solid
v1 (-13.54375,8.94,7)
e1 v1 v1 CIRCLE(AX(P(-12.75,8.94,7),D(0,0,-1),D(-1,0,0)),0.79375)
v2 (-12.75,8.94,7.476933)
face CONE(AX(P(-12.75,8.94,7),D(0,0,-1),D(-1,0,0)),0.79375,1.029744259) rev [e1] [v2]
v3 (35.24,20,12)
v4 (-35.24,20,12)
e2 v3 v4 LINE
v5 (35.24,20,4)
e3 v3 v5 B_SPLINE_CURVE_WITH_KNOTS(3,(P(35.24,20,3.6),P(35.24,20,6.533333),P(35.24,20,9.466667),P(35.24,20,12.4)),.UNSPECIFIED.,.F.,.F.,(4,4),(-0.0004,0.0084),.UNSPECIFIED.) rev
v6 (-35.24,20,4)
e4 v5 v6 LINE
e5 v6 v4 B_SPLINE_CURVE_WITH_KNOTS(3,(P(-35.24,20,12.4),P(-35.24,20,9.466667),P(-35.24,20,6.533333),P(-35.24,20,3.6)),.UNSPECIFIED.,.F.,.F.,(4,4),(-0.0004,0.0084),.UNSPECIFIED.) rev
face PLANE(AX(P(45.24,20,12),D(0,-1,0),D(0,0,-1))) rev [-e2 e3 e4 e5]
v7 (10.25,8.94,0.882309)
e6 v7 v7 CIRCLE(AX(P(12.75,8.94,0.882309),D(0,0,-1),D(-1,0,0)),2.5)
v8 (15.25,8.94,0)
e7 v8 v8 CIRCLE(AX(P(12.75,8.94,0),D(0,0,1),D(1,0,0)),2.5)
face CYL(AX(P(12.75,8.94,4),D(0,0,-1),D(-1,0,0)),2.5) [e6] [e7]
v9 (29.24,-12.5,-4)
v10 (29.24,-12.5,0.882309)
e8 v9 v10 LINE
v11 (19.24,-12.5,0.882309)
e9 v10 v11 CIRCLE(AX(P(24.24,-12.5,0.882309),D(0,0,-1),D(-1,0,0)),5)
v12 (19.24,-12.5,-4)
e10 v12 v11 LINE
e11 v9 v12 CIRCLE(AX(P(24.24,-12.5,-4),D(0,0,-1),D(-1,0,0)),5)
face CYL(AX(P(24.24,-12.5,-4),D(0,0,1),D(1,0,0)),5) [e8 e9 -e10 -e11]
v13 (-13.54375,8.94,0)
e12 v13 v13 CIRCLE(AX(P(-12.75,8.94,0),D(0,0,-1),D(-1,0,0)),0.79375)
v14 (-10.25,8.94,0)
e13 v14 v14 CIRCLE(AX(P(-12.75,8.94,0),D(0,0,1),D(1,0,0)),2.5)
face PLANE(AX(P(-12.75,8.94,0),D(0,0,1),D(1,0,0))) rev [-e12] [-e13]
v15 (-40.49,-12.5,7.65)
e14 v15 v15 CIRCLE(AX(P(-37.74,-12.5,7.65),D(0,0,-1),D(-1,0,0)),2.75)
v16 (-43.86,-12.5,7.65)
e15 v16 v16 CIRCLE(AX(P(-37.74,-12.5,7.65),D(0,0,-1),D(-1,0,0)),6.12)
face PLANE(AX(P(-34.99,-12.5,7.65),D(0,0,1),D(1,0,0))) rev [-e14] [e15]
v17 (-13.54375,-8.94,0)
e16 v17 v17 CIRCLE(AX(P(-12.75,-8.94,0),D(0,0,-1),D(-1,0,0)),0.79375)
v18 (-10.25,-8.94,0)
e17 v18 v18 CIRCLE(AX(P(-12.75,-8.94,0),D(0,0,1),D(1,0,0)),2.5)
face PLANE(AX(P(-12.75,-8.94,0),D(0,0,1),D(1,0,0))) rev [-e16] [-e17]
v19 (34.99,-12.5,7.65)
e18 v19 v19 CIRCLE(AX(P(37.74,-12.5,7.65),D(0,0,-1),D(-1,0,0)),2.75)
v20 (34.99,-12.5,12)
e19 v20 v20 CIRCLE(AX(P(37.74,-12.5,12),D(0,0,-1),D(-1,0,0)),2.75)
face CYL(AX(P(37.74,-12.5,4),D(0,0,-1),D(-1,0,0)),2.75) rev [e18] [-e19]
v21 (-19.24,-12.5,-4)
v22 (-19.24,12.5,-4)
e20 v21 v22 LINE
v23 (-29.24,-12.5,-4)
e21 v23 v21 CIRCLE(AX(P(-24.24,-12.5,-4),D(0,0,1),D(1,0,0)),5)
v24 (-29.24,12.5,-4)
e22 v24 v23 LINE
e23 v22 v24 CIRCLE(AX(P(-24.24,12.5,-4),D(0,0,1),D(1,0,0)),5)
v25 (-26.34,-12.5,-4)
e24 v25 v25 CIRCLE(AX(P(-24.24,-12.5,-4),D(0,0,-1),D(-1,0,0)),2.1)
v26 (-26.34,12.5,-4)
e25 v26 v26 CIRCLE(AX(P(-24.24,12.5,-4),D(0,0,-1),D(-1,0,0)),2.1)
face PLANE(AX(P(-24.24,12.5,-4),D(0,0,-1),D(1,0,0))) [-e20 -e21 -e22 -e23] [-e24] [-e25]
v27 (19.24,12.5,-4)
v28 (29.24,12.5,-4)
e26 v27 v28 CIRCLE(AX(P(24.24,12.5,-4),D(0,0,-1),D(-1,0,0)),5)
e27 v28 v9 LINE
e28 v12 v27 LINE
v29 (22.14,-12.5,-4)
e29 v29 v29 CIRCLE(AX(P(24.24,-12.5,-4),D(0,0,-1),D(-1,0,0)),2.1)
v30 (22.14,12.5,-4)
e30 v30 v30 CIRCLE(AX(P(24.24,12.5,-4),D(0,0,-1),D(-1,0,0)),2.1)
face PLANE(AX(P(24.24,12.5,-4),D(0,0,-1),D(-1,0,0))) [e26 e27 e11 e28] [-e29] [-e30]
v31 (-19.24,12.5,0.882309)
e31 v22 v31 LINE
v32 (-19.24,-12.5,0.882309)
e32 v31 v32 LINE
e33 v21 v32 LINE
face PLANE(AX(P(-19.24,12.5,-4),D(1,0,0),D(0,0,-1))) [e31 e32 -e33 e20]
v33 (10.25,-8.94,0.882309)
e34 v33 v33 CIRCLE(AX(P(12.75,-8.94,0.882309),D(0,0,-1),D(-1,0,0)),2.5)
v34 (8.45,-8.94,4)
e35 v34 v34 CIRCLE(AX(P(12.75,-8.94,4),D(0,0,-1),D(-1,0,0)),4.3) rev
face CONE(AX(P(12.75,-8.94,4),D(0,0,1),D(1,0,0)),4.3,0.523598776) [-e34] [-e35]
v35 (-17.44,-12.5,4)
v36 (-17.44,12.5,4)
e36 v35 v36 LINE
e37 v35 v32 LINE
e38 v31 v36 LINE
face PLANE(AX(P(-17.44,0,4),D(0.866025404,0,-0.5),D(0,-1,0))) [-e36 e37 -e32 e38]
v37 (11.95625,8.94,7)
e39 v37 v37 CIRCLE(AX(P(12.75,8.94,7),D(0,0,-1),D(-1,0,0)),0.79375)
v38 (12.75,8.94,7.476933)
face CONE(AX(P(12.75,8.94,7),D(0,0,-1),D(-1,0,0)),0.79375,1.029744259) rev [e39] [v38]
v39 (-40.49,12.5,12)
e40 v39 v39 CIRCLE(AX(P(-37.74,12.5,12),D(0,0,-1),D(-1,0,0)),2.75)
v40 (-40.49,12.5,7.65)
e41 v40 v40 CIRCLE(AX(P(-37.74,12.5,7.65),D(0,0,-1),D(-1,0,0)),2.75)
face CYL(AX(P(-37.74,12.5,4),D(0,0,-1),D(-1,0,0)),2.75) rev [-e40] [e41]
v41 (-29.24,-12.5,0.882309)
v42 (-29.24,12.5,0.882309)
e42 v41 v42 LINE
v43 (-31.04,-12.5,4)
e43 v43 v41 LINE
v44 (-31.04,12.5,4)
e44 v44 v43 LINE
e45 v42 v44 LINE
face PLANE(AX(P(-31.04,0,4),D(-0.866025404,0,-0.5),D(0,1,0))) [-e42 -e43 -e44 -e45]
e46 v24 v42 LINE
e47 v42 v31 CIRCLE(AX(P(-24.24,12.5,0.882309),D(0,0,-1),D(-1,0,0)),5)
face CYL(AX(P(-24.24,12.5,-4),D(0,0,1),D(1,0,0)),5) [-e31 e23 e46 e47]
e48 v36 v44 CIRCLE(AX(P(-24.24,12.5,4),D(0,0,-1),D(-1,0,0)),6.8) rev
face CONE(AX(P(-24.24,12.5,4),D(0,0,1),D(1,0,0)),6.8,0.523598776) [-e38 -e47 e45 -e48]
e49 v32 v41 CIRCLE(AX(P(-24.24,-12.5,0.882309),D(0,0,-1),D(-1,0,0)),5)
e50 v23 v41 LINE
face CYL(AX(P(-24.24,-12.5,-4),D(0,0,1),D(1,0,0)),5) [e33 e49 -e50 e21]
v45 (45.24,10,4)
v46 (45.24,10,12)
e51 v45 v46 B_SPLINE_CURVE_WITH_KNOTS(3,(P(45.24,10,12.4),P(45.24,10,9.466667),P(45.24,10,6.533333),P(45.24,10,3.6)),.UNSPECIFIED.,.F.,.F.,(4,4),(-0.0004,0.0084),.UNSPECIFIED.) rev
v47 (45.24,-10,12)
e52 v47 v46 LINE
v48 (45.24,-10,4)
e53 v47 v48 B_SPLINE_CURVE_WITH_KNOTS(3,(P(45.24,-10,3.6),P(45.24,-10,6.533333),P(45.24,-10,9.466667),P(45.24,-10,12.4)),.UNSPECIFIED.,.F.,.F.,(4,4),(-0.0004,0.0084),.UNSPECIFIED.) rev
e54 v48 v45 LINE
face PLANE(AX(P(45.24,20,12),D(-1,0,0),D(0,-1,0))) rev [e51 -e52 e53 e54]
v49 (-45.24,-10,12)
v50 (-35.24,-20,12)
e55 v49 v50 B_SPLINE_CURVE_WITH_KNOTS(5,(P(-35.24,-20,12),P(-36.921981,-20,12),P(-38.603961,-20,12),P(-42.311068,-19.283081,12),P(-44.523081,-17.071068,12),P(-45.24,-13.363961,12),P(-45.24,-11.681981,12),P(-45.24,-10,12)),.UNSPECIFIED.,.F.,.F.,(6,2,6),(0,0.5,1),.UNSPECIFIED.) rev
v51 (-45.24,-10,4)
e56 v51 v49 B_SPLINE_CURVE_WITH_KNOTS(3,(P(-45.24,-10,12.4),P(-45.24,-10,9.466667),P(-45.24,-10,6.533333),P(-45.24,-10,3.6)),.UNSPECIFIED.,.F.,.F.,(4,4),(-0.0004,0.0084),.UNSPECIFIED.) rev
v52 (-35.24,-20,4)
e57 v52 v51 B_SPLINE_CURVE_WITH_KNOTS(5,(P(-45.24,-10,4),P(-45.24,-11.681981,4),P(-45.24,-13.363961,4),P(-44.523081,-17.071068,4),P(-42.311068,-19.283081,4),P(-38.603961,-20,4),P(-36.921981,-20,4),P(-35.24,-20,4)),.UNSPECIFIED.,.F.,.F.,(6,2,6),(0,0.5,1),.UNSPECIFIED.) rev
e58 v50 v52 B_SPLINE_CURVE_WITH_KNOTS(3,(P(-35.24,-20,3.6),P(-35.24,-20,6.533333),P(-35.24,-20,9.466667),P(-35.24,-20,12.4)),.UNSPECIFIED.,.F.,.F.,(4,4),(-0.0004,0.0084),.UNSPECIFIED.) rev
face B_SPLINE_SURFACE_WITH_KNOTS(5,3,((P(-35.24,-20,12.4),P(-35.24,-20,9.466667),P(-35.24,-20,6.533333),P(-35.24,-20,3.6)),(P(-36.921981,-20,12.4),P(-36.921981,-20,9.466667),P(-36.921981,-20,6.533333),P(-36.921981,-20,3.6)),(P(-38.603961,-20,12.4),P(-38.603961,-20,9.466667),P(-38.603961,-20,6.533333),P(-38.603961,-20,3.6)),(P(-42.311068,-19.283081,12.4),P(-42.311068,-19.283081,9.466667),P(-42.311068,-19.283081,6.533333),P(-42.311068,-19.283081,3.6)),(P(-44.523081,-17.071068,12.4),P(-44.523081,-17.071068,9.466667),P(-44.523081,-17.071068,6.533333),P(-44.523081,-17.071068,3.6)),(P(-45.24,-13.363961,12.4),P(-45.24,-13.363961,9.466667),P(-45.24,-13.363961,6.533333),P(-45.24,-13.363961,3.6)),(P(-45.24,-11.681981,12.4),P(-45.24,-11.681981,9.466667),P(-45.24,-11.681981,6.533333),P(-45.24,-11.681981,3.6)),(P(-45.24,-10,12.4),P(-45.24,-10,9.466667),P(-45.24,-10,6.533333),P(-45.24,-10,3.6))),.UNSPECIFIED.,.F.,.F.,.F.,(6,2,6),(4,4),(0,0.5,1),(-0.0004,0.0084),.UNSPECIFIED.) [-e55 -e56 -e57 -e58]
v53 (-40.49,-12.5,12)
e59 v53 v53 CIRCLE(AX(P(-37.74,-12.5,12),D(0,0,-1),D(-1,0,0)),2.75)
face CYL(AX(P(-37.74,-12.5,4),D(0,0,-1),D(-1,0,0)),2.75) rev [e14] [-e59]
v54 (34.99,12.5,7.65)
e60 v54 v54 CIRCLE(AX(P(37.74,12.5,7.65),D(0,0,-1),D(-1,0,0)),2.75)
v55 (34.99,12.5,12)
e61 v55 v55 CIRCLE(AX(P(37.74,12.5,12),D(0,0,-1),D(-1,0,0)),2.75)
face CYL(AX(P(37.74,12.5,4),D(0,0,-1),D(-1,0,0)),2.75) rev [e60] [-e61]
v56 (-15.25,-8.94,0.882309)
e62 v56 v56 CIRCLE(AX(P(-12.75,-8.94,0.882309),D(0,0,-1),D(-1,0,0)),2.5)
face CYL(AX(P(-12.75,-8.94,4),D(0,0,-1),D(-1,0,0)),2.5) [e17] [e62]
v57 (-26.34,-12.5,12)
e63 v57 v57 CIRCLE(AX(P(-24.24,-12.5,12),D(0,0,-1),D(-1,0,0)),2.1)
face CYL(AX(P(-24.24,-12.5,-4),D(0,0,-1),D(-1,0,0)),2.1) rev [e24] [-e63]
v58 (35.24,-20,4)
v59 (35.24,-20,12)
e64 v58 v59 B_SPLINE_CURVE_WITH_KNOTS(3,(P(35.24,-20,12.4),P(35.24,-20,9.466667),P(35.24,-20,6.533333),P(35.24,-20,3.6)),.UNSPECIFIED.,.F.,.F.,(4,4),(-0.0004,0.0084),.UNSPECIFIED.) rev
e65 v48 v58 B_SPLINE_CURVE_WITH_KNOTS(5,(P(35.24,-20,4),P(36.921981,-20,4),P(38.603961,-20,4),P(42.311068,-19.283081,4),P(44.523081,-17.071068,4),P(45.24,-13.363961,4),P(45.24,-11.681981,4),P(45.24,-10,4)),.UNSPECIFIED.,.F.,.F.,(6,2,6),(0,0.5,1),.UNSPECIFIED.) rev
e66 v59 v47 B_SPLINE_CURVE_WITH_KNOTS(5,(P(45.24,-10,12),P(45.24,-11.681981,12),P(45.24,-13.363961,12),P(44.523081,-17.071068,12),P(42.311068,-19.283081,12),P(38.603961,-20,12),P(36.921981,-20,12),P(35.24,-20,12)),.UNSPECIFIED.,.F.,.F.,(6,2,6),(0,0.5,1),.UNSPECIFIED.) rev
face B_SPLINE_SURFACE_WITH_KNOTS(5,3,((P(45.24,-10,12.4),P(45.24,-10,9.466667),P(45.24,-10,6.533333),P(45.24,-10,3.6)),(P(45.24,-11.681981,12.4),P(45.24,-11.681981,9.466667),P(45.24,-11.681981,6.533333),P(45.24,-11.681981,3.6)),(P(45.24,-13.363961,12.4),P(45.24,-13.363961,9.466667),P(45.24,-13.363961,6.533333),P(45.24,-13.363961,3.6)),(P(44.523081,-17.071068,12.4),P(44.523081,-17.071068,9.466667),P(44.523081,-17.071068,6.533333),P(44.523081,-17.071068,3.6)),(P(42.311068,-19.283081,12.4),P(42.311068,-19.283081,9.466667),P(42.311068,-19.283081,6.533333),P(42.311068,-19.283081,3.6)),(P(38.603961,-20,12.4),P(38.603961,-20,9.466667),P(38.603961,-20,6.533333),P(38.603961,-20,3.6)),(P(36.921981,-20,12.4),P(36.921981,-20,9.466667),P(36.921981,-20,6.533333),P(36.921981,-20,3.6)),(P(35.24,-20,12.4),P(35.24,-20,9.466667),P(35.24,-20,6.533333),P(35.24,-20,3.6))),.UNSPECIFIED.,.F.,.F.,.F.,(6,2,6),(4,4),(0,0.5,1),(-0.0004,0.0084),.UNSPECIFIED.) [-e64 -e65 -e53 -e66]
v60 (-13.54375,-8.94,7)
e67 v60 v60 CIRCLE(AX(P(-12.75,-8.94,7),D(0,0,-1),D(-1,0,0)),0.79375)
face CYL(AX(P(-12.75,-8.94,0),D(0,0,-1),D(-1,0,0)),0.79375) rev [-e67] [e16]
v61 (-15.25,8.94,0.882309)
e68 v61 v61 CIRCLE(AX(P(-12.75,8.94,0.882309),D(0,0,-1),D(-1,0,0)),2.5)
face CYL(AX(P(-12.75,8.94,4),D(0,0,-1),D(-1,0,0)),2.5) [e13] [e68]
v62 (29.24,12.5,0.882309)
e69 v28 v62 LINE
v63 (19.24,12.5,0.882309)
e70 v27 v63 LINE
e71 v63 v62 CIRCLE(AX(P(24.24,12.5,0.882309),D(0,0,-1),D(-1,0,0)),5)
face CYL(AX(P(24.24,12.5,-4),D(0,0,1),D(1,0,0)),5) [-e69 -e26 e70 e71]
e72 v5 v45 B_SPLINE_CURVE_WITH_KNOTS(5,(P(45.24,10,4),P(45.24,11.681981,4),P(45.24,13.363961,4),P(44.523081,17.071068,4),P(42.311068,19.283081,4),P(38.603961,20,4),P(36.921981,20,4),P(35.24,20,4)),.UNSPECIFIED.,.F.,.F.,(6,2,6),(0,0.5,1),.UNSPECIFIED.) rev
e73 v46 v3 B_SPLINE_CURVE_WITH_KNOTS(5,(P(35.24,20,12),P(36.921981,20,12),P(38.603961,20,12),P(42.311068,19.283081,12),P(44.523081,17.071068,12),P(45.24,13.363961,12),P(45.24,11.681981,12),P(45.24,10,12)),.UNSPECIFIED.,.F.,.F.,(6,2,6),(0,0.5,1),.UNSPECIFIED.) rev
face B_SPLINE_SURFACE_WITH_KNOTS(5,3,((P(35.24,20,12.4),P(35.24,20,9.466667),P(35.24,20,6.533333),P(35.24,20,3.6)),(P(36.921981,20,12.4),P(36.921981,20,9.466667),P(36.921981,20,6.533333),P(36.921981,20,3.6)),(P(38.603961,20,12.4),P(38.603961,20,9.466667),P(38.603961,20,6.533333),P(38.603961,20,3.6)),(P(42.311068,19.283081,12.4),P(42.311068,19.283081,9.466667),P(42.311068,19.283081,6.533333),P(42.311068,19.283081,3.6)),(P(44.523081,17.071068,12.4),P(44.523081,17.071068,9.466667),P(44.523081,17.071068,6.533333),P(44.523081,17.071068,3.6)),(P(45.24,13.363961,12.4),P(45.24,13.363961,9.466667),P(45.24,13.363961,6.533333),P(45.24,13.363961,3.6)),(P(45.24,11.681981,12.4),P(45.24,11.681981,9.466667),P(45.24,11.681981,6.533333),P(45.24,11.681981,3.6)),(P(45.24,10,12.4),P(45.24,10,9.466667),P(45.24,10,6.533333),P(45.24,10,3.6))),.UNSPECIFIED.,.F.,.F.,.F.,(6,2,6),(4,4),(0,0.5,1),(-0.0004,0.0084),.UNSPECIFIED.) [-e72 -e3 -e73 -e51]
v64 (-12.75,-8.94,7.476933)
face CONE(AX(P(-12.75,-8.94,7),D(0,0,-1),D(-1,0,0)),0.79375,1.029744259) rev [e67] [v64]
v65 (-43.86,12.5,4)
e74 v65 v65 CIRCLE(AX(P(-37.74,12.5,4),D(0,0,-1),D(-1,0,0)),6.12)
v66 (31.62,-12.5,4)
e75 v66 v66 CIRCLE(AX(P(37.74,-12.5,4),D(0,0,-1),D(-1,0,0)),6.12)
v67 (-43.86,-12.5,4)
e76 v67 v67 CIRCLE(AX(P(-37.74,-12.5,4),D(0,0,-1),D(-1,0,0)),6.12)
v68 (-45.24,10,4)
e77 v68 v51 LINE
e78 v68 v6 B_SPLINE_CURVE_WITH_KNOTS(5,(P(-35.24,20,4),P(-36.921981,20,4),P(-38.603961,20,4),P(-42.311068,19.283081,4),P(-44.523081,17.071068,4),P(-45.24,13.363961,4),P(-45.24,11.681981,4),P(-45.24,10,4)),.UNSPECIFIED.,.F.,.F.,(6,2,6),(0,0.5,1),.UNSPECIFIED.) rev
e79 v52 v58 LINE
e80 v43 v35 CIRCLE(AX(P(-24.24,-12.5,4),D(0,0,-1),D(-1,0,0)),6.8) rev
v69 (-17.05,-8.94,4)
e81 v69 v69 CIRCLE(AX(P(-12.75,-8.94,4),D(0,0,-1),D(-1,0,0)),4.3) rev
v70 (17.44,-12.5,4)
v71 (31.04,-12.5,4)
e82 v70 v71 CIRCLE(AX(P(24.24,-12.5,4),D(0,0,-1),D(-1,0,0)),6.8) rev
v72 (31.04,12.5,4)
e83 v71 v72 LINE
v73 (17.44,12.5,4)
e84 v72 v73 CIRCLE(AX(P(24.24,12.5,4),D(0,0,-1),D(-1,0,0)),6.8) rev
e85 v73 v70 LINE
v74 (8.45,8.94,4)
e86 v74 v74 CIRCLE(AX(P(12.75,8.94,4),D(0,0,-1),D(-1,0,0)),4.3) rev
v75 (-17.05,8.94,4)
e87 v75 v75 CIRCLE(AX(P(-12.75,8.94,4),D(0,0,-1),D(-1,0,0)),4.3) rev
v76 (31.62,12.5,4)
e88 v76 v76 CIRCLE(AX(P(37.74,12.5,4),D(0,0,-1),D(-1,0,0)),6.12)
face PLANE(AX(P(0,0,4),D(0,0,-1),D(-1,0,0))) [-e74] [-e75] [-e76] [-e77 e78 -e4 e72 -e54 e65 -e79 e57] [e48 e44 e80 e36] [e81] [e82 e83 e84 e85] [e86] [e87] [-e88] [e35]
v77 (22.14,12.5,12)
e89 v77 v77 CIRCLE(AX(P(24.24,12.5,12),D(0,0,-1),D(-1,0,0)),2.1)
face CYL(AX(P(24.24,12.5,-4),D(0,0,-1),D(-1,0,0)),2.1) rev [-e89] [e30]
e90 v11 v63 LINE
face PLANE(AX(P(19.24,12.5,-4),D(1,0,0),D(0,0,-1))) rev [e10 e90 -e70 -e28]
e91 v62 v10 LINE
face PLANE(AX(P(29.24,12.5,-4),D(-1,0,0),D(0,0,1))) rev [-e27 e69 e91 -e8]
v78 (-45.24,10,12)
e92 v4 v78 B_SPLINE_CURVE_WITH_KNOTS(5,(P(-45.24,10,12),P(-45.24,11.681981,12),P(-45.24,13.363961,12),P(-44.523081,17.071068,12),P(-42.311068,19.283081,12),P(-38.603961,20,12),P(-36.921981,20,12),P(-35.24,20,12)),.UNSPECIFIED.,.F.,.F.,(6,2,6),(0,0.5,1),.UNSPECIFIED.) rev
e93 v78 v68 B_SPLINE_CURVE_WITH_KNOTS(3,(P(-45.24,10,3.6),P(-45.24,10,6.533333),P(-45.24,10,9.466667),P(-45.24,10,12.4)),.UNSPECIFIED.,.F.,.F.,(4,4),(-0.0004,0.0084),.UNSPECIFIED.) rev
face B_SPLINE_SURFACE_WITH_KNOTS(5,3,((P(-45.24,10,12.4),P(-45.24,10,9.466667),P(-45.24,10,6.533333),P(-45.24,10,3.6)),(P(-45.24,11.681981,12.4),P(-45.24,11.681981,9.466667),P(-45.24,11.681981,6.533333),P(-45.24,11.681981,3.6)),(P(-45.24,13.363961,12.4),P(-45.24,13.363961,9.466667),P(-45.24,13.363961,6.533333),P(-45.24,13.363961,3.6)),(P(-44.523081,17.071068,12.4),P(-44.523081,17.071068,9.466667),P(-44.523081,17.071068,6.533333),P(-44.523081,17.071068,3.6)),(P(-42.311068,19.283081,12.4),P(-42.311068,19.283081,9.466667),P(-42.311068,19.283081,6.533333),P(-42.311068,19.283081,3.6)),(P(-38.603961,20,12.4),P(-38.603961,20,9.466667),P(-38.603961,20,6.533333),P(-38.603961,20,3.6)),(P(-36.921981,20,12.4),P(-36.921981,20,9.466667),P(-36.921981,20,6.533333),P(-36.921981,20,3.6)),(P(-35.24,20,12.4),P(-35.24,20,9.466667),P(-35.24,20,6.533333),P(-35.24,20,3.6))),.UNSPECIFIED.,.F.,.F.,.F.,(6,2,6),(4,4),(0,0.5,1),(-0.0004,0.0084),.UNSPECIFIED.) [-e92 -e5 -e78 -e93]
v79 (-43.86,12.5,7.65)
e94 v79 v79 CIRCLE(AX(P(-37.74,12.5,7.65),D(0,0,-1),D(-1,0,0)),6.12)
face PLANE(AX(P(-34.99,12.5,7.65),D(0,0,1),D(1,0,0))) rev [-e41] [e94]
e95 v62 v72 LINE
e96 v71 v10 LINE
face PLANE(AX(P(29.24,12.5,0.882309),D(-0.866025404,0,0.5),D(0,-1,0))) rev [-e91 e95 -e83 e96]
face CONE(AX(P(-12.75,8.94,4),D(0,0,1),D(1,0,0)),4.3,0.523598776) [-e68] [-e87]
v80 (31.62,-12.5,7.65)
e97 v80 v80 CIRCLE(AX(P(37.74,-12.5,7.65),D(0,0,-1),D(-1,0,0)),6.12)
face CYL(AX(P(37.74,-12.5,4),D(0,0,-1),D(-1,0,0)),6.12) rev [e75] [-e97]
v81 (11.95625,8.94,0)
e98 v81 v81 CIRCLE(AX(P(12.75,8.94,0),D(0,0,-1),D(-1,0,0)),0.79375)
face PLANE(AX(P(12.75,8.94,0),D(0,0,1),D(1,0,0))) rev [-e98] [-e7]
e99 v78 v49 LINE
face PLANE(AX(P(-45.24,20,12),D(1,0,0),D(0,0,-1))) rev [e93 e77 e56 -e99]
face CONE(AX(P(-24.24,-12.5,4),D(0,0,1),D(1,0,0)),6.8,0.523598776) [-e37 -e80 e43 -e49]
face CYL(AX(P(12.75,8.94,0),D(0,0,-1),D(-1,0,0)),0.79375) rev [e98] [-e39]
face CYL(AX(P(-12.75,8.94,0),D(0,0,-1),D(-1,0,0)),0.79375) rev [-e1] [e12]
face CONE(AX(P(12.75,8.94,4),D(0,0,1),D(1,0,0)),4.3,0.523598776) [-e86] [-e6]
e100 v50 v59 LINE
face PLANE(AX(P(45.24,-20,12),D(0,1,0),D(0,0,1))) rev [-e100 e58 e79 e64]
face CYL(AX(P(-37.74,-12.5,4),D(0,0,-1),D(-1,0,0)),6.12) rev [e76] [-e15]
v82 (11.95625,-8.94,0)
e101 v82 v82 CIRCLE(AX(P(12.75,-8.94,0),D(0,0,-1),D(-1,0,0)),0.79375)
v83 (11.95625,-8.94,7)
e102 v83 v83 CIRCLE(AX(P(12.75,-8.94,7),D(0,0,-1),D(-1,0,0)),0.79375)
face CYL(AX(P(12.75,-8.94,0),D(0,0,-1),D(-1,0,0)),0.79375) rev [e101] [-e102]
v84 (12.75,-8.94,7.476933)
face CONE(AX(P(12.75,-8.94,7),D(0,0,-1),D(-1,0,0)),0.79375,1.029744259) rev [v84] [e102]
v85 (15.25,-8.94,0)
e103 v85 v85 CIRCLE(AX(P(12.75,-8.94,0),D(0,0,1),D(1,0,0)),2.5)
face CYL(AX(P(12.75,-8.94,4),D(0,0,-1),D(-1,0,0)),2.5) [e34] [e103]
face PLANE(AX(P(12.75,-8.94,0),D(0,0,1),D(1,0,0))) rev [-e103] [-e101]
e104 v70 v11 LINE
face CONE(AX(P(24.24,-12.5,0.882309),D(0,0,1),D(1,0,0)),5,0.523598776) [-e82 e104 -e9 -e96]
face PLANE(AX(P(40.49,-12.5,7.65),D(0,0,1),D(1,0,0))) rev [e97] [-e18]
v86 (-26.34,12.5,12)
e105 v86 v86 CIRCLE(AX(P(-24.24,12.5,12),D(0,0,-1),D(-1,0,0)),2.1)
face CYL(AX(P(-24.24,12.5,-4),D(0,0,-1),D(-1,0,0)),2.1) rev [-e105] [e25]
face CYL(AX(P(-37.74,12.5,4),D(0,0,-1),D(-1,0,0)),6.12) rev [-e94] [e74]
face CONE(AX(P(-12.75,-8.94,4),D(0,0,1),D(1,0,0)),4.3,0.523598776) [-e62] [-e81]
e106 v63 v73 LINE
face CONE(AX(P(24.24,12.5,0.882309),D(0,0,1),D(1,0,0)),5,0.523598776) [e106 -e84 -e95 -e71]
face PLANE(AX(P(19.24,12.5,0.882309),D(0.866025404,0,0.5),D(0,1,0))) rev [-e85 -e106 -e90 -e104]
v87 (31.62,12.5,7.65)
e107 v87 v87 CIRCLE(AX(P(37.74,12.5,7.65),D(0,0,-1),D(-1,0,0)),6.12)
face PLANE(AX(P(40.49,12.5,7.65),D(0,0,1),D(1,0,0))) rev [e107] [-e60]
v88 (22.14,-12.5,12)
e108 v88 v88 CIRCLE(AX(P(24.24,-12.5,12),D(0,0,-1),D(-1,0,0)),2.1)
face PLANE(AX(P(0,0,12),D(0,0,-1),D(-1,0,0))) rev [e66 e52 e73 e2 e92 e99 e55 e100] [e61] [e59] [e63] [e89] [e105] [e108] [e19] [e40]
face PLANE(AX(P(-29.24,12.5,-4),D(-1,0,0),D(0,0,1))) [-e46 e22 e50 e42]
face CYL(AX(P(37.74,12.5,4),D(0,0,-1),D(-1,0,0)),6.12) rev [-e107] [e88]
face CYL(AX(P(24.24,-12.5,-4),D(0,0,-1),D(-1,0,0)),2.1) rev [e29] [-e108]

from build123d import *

# Parameters (mm, degrees)
SKETCH1_R                                    = 2.5
BOSS_EXTRUDE1_DEPTH                          = 4
BOSS_EXTRUDE1_2_DEPTH                        = 4
BOSS_EXTRUDE1_3_DEPTH                        = 4
BOSS_EXTRUDE1_4_DEPTH                        = 4
SKETCH2_W                                    = 90.48
SKETCH2_H                                    = 40
BOSS_EXTRUDE2_DEPTH                          = 8
CBORE_FOR_M5_HEX_HEAD_CAP_SCREW1_D           = 5.5
CBORE_FOR_M5_HEX_HEAD_CAP_SCREW1_CBORE_D     = 12.24
CBORE_FOR_M5_HEX_HEAD_CAP_SCREW1_CBORE_DEPTH = 3.65
F_1_16_0_0625_DIAMETER_HOLE1_D               = 1.5875
F_1_16_0_0625_DIAMETER_HOLE1_DEPTH           = 7
F_1_16_0_0625_DIAMETER_HOLE1_TIP             = 0.476933116
FILLET1_SIZE                                 = 10
BOSS_EXTRUDE3_DEPTH                          = 8
M5X0_8_TAPPED_HOLE2_D                        = 4.2
CHAMFER1_SIZE                                = 1.8
CHAMFER1_SIZE2                               = 3.117691454


with BuildPart() as part:
    # Sketch1 → Boss-Extrude1 (new body)
    with BuildSketch(Plane.XY):
        with Locations((12.75, 8.94)):
            Circle(SKETCH1_R)
    extrude(amount=BOSS_EXTRUDE1_DEPTH)



with BuildPart() as body_2:
    # Sketch1 → Boss-Extrude1 2 (new body)
    with BuildSketch(Plane.XY):
        with Locations((12.75, -8.94)):
            Circle(SKETCH1_R)
    extrude(amount=BOSS_EXTRUDE1_2_DEPTH)


with BuildPart() as body_3:
    # Sketch1 → Boss-Extrude1 3 (new body)
    with BuildSketch(Plane.XY):
        with Locations((-12.75, -8.94)):
            Circle(SKETCH1_R)
    extrude(amount=BOSS_EXTRUDE1_3_DEPTH)


with BuildPart() as body_4:
    # Sketch1 → Boss-Extrude1 4 (new body)
    with BuildSketch(Plane.XY):
        with Locations((-12.75, 8.94)):
            Circle(SKETCH1_R)
    extrude(amount=BOSS_EXTRUDE1_4_DEPTH)


with BuildPart() as part_1:
    add(part.part)

    add(body_2.part)  # Boss-Extrude2 merges body 2

    add(body_3.part)  # Boss-Extrude2 merges body 3

    add(body_4.part)  # Boss-Extrude2 merges body 4
    # Sketch2 → Boss-Extrude2 (add)
    with BuildSketch(Plane.XY.offset(4)):
        Rectangle(SKETCH2_W, SKETCH2_H)
    extrude(amount=BOSS_EXTRUDE2_DEPTH)

    # CBORE for M5 Hex Head Cap Screw1 (through all)
    with Locations(Plane(origin=(0, 0, 4), x_dir=(-1, 0, 0), z_dir=(0, 0, -1))):
        with Locations((37.74, 12.5), (-37.74, -12.5), (-37.74, 12.5), (37.74, -12.5)):
            CounterBoreHole(CBORE_FOR_M5_HEX_HEAD_CAP_SCREW1_D / 2, CBORE_FOR_M5_HEX_HEAD_CAP_SCREW1_CBORE_D / 2, CBORE_FOR_M5_HEX_HEAD_CAP_SCREW1_CBORE_DEPTH)

    # 1/16 (0.0625) Diameter Hole1
    with Locations(Plane(origin=(0, 0, 0), x_dir=(-1, 0, 0), z_dir=(0, 0, -1))):
        with Locations((-12.75, -8.94), (-12.75, 8.94), (12.75, -8.94), (12.75, 8.94)):
            Hole(F_1_16_0_0625_DIAMETER_HOLE1_D / 2, depth=F_1_16_0_0625_DIAMETER_HOLE1_DEPTH)
            with Locations((0, 0, -(F_1_16_0_0625_DIAMETER_HOLE1_DEPTH + F_1_16_0_0625_DIAMETER_HOLE1_TIP / 2))):  # 118° drill point
                Cone(0, F_1_16_0_0625_DIAMETER_HOLE1_D / 2, F_1_16_0_0625_DIAMETER_HOLE1_TIP, mode=Mode.SUBTRACT)

    # Fillet1
    # a fillet whose section is not a circle: 10 mm, written as the material it takes off along each edge
    with BuildSketch(Plane(origin=(-45.24, -20, -21), x_dir=(0, 1, 0), z_dir=(0, 0, 1)), Plane(origin=(-45.24, 20, -21), x_dir=(1, 0, 0), z_dir=(0, 0, 1))) as fillet1_piece_1:
        with BuildLine():
            add(Edge.make_bspline([(FILLET1_SIZE, 0), (FILLET1_SIZE * 0.831801948466, 0), (FILLET1_SIZE * 0.663603896932, 0), (FILLET1_SIZE * 0.292893218813, -FILLET1_SIZE * 0.0716919198361), (FILLET1_SIZE * 0.0716919198361, -FILLET1_SIZE * 0.292893218813), (0, -FILLET1_SIZE * 0.663603896932), (0, -FILLET1_SIZE * 0.831801948466), (0, -FILLET1_SIZE)], knots=[0, 0, 0, 0, 0, 0, 0.5, 0.5, 1, 1, 1, 1, 1, 1], degree=5))
            Line((0, -FILLET1_SIZE), (0, 0))
            Line((0, 0), (FILLET1_SIZE, 0))
        make_face()
    extrude(amount=58, mode=Mode.SUBTRACT)
    with BuildSketch(Plane(origin=(45.24, 20, -21), x_dir=(-1, 0, 0), z_dir=(0, 0, 1)), Plane(origin=(45.24, -20, -21), x_dir=(0, 1, 0), z_dir=(0, 0, 1))) as fillet1_piece_2:
        with BuildLine():
            add(Edge.make_bspline([(FILLET1_SIZE, 0), (FILLET1_SIZE * 0.831801948466, 0), (FILLET1_SIZE * 0.663603896932, 0), (FILLET1_SIZE * 0.292893218813, FILLET1_SIZE * 0.0716919198361), (FILLET1_SIZE * 0.0716919198361, FILLET1_SIZE * 0.292893218813), (0, FILLET1_SIZE * 0.663603896932), (0, FILLET1_SIZE * 0.831801948466), (0, FILLET1_SIZE)], knots=[0, 0, 0, 0, 0, 0, 0.5, 0.5, 1, 1, 1, 1, 1, 1], degree=5))
            Line((0, FILLET1_SIZE), (0, 0))
            Line((0, 0), (FILLET1_SIZE, 0))
        make_face()
    extrude(amount=58, mode=Mode.SUBTRACT)

    # Sketch13 → Boss-Extrude3 (add)
    with BuildSketch(Plane(origin=(0, 0, 4), x_dir=(-1, 0, 0), z_dir=(0, 0, -1))):
        with BuildLine():
            Line((-19.24, 12.5), (-19.24, -12.5))
            ThreePointArc((-19.24, -12.5), (-24.24, -17.5), (-29.24, -12.5))
            Line((-29.24, -12.5), (-29.24, 12.5))
            ThreePointArc((-29.24, 12.5), (-24.24, 17.5), (-19.24, 12.5))
        make_face()
    boss_extrude3 = extrude(amount=BOSS_EXTRUDE3_DEPTH)

    # M5x0.8 Tapped Hole2 (through all)
    with Locations(Plane(origin=(0, 0, -4), x_dir=(-1, 0, 0), z_dir=(0, 0, -1))):
        with Locations((-24.24, -12.5), (-24.24, 12.5)):
            m5x0_8_tapped_hole2 = Hole(M5X0_8_TAPPED_HOLE2_D / 2)

    # Mirror2: Boss-Extrude3, M5x0.8 Tapped Hole2 across plane
    add(boss_extrude3.mirror(Plane(origin=(0, 0, 0), x_dir=(0, 0, 1), z_dir=(1, 0, 0))))
    add(m5x0_8_tapped_hole2.mirror(Plane(origin=(0, 0, 0), x_dir=(0, 0, 1), z_dir=(1, 0, 0))), mode=Mode.SUBTRACT)

    # Chamfer1
    chamfer1_edges = [part_1.edges().sort_by_distance(p)[0] for p in [
        (24.24, 17.5, 4),
        (29.24, 0, 4),
        (24.24, -17.5, 4),
        (19.24, 0, 4),
        (-24.24, 17.5, 4),
        (-29.24, 0, 4),
        (-24.24, -17.5, 4),
        (-19.24, 0, 4),
        (10.25, -8.94, 4),
        (-15.25, -8.94, 4),
        (-15.25, 8.94, 4),
        (10.25, 8.94, 4),
    ]]
    chamfer1_side = [part_1.faces().sort_by_distance(p)[0] for p in [
        (0, -1.03e-07, 4),
    ]]
    chamfer(chamfer1_edges, length=CHAMFER1_SIZE, length2=CHAMFER1_SIZE2, reference=chamfer1_side[0])


solid = part_1.part
